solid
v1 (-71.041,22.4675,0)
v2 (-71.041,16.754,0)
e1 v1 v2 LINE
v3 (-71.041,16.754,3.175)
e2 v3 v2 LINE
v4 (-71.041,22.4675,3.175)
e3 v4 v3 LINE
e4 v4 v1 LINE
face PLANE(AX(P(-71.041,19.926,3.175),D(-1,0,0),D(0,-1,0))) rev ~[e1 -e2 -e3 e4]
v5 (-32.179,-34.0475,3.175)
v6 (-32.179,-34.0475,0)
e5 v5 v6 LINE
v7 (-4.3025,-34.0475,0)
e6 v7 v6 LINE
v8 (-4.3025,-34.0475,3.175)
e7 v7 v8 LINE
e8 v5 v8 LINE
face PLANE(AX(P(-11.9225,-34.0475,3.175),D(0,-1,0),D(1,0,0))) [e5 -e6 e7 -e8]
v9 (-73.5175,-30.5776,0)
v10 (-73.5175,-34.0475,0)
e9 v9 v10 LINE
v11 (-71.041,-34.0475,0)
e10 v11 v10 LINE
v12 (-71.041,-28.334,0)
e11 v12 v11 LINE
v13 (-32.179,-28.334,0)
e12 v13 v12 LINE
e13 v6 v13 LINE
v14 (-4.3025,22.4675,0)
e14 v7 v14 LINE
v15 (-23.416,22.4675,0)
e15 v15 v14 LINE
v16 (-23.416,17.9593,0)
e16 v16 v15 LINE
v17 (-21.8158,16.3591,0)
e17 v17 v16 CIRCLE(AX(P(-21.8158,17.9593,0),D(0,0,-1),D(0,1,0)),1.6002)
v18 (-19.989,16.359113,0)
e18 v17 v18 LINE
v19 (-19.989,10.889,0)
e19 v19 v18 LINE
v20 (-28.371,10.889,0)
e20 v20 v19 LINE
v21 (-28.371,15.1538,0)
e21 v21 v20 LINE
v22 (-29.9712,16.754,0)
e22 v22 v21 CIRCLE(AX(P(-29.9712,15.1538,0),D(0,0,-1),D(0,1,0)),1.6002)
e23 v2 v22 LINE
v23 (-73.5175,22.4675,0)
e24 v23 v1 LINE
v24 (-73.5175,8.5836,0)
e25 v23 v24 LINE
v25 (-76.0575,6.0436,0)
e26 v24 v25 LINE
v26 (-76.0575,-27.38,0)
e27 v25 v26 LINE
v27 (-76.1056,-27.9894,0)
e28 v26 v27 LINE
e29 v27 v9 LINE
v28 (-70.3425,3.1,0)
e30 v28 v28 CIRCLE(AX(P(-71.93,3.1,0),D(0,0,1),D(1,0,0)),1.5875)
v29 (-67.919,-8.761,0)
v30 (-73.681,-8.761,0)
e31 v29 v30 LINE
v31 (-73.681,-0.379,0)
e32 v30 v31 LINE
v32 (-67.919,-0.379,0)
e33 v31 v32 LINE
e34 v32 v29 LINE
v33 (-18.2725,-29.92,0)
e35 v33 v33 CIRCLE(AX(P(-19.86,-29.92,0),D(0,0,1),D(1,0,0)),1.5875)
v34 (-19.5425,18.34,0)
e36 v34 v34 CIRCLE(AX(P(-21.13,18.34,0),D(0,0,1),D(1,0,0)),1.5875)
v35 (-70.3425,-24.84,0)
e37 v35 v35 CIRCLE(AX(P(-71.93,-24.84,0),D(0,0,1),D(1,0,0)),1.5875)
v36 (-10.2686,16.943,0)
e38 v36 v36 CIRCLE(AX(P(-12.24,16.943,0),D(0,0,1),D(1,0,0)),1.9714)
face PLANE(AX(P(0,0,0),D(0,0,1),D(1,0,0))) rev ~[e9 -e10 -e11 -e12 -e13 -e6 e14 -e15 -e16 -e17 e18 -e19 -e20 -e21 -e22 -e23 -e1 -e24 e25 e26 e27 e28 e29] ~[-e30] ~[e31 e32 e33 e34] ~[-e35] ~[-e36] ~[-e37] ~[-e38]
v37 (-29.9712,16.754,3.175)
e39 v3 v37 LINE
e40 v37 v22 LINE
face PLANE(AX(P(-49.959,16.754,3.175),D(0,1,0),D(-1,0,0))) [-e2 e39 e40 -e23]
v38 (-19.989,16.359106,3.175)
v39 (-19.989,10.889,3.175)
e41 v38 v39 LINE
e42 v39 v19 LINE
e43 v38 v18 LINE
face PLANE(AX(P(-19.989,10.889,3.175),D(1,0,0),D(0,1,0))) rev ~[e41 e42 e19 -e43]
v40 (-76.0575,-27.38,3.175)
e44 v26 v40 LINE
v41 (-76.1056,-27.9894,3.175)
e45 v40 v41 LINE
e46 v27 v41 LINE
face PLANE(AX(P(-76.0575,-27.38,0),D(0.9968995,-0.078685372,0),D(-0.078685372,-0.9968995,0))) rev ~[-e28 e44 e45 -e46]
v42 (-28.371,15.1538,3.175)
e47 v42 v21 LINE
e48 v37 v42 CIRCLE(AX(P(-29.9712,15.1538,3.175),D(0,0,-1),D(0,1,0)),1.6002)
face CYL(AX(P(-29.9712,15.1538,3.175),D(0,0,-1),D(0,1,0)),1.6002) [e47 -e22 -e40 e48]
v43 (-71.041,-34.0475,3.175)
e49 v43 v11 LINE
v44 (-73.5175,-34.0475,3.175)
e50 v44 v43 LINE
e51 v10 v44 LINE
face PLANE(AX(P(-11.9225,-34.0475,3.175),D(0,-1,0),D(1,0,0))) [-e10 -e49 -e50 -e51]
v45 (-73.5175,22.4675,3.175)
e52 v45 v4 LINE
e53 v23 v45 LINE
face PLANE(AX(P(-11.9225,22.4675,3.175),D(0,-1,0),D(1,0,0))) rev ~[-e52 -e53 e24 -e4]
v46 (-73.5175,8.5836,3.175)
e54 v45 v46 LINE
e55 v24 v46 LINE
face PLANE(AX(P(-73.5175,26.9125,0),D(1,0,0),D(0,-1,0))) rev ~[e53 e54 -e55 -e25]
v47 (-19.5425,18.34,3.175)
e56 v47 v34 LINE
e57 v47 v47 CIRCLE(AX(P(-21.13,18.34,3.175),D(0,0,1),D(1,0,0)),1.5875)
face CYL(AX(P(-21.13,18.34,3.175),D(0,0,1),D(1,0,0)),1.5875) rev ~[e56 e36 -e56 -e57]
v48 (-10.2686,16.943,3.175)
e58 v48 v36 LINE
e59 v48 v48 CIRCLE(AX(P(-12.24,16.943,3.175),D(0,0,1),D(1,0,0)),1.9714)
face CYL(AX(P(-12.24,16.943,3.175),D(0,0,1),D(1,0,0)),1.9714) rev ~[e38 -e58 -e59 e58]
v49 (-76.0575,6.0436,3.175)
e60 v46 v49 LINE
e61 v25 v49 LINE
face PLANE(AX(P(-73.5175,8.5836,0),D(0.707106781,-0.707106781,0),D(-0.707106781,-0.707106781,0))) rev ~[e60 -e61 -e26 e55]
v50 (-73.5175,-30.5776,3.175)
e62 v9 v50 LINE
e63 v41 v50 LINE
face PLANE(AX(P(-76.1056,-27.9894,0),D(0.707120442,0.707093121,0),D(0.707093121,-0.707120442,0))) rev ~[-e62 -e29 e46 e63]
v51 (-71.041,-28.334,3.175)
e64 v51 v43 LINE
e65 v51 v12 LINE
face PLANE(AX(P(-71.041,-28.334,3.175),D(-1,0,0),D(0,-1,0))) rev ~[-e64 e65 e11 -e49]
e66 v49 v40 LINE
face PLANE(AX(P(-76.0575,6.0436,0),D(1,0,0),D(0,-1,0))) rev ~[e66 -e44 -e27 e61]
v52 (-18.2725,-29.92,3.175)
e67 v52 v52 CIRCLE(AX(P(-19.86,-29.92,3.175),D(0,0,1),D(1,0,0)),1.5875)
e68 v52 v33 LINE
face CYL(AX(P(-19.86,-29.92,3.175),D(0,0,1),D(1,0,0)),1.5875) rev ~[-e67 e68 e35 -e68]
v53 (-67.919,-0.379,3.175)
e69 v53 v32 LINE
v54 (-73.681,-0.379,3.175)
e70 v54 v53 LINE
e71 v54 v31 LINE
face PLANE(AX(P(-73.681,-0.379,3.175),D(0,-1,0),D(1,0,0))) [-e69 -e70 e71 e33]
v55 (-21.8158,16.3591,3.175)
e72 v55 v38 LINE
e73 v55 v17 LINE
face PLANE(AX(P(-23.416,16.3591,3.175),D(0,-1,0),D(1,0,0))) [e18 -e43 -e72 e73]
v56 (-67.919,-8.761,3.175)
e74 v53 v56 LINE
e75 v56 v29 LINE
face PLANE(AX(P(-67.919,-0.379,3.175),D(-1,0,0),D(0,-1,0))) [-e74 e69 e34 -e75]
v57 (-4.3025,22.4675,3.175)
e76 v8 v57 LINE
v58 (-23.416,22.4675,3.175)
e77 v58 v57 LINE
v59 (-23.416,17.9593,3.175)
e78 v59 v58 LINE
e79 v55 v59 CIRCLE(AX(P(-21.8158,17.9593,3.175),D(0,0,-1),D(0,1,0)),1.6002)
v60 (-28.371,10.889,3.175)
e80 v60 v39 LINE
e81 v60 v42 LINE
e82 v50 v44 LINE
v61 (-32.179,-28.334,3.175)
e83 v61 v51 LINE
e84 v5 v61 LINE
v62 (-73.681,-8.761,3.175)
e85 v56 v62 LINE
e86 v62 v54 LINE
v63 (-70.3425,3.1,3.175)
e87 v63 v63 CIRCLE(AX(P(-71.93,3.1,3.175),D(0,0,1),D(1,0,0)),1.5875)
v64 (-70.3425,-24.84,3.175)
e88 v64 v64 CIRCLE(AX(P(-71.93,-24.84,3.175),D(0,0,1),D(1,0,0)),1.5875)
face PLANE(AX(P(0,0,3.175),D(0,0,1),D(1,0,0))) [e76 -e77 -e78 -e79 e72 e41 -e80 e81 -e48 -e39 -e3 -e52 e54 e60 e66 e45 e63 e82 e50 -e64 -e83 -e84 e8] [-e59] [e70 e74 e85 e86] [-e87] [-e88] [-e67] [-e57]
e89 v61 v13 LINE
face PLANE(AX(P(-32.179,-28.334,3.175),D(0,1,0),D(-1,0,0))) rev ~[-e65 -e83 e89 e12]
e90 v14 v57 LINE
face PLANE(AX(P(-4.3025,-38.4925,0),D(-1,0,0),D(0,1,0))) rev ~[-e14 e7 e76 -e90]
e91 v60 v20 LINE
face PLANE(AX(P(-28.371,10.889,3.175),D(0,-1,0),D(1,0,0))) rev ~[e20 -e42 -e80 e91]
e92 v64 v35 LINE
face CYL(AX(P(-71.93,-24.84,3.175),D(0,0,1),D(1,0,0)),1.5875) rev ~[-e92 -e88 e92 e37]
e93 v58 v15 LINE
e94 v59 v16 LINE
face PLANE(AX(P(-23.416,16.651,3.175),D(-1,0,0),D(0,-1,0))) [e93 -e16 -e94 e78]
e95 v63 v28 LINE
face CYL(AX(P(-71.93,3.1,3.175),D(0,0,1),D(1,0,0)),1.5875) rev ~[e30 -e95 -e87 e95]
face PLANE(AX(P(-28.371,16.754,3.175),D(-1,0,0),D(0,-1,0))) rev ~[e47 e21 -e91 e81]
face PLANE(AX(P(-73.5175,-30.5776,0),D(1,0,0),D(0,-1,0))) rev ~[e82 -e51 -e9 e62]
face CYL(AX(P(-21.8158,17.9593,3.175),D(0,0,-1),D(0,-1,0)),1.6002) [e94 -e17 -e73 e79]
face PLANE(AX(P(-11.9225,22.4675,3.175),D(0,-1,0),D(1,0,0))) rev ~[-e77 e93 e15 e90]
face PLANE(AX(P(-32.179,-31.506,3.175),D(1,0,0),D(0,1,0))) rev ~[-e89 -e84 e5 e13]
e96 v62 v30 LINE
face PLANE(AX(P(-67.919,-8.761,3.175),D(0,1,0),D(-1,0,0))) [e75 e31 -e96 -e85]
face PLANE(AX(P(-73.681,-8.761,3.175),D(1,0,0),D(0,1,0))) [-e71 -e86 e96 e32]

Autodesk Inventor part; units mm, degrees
ref_plane "YZ Plane" through (0, 0, 0) normal (1, 0, 0) x (0, 1, 0)
ref_plane "XZ Plane" through (0, 0, 0) normal (0, 1, 0) x (-1, 0, 0)
ref_plane "XY Plane" through (0, 0, 0) normal (0, 0, 1) x (1, 0, 0)
sketch "0" plane through (0, 0, 0) normal (0, 0, 1) x (1, 0, 0)
  line L0 (-4.3025, -38.4925) -> (-4.3025, 26.9125)
  arc A0 (-4.3025, 26.9125) -> (-7.4775, 30.0875) centre (-7.4775, 26.9125) ccw
  line L1 (-7.4775, 30.0875) -> (-8.7475, 30.0875)
  arc A1 (-8.7475, 30.0875) -> (-11.9225, 26.9125) centre (-8.7475, 26.9125) ccw
  line L2 (-11.9225, 26.9125) -> (-11.9225, 22.4675)
  line L3 (-11.9225, 22.4675) -> (-65.8975, 22.4675)
  line L4 (-65.8975, 22.4675) -> (-65.8975, 26.9125)
  arc A2 (-65.8975, 26.9125) -> (-69.0725, 30.0875) centre (-69.0725, 26.9125) ccw
  line L5 (-69.0725, 30.0875) -> (-70.3425, 30.0875)
  arc A3 (-70.3425, 30.0875) -> (-73.5175, 26.9125) centre (-70.3425, 26.9125) ccw
  line L6 (-73.5175, 26.9125) -> (-73.5175, 8.5836)
  line L7 (-73.5175, 8.5836) -> (-76.0575, 6.0436)
  line L8 (-76.0575, 6.0436) -> (-76.0575, -27.38)
  line L9 (-76.0575, -27.38) -> (-76.1056, -27.9894)
  line L10 (-76.1056, -27.9894) -> (-73.5175, -30.5776)
  line L11 (-73.5175, -30.5776) -> (-73.5175, -38.4925)
  arc A4 (-73.5175, -38.4925) -> (-70.3425, -41.6675) centre (-70.3425, -38.4925) ccw
  line L12 (-70.3425, -41.6675) -> (-69.0725, -41.6675)
  arc A5 (-69.0725, -41.6675) -> (-65.8975, -38.4925) centre (-69.0725, -38.4925) ccw
  line L13 (-65.8975, -38.4925) -> (-65.8975, -34.0475)
  line L14 (-65.8975, -34.0475) -> (-11.9225, -34.0475)
  line L15 (-11.9225, -34.0475) -> (-11.9225, -38.4925)
  arc A6 (-11.9225, -38.4925) -> (-8.7475, -41.6675) centre (-8.7475, -38.4925) ccw
  line L16 (-8.7475, -41.6675) -> (-7.4775, -41.6675)
  arc A7 (-7.4775, -41.6675) -> (-4.3025, -38.4925) centre (-7.4775, -38.4925) ccw
  line L17 (-5.89, 20.88) -> (-5.89, -32.46)
  line L18 (-5.89, -32.46) -> (-71.93, -32.46)
  line L19 (-71.93, -32.46) -> (-71.93, -29.92)
  line L20 (-71.93, -29.92) -> (-74.47, -27.38)
  line L21 (-74.47, -27.38) -> (-74.47, 5.386)
  line L22 (-74.47, 5.386) -> (-71.93, 7.926)
  line L23 (-71.93, 7.926) -> (-71.93, 20.88)
  line L24 (-71.93, 20.88) -> (-5.89, 20.88)
  line L25 (-48.816, 17.135) -> (-23.416, 17.135)
  line L26 (-23.416, 17.135) -> (-23.416, 19.545)
  line L27 (-23.416, 19.545) -> (-48.816, 19.545)
  line L28 (-48.816, 19.545) -> (-48.816, 17.135)
  line L29 (-46.546, 19.34) -> (-46.546, 17.34)
  line L30 (-46.546, 17.34) -> (-48.546, 17.34)
  line L31 (-48.546, 17.34) -> (-48.546, 19.34)
  line L32 (-48.546, 19.34) -> (-46.546, 19.34)
  line L33 (-44.006, 19.34) -> (-44.006, 17.34)
  line L34 (-44.006, 17.34) -> (-46.006, 17.34)
  line L35 (-46.006, 17.34) -> (-46.006, 19.34)
  line L36 (-46.006, 19.34) -> (-44.006, 19.34)
  line L37 (-41.466, 19.34) -> (-41.466, 17.34)
  line L38 (-41.466, 17.34) -> (-43.466, 17.34)
  line L39 (-43.466, 17.34) -> (-43.466, 19.34)
  line L40 (-43.466, 19.34) -> (-41.466, 19.34)
  line L41 (-38.926, 19.34) -> (-38.926, 17.34)
  line L42 (-38.926, 17.34) -> (-40.926, 17.34)
  line L43 (-40.926, 17.34) -> (-40.926, 19.34)
  line L44 (-40.926, 19.34) -> (-38.926, 19.34)
  line L45 (-36.386, 19.34) -> (-36.386, 17.34)
  line L46 (-36.386, 17.34) -> (-38.386, 17.34)
  line L47 (-38.386, 17.34) -> (-38.386, 19.34)
  line L48 (-38.386, 19.34) -> (-36.386, 19.34)
  line L49 (-33.846, 19.34) -> (-33.846, 17.34)
  line L50 (-33.846, 17.34) -> (-35.846, 17.34)
  line L51 (-35.846, 17.34) -> (-35.846, 19.34)
  line L52 (-35.846, 19.34) -> (-33.846, 19.34)
  line L53 (-31.306, 19.34) -> (-31.306, 17.34)
  line L54 (-31.306, 17.34) -> (-33.306, 17.34)
  line L55 (-33.306, 17.34) -> (-33.306, 19.34)
  line L56 (-33.306, 19.34) -> (-31.306, 19.34)
  line L57 (-28.766, 19.34) -> (-28.766, 17.34)
  line L58 (-28.766, 17.34) -> (-30.766, 17.34)
  line L59 (-30.766, 17.34) -> (-30.766, 19.34)
  line L60 (-30.766, 19.34) -> (-28.766, 19.34)
  line L61 (-26.226, 17.34) -> (-28.226, 17.34)
  line L62 (-28.226, 17.34) -> (-28.226, 19.34)
  line L63 (-28.226, 19.34) -> (-26.226, 19.34)
  line L64 (-26.226, 19.34) -> (-26.226, 17.34)
  line L65 (-25.686, 17.34) -> (-25.686, 19.34)
  line L66 (-25.686, 19.34) -> (-23.686, 19.34)
  line L67 (-23.686, 19.34) -> (-23.686, 17.34)
  line L68 (-23.686, 17.34) -> (-25.686, 17.34)
  line L69 (-20.87, 16.27) -> (-22.41, 16.27)
  arc A8 (-22.41, 16.27) -> (-22.91, 15.77) centre (-22.41, 15.77) ccw
  arc A9 (-22.91, 15.77) -> (-23.41, 16.27) centre (-23.41, 15.77) ccw
  line L70 (-23.41, 16.27) -> (-24.95, 16.27)
  arc A10 (-24.95, 16.27) -> (-25.45, 15.77) centre (-24.95, 15.77) ccw
  arc A11 (-25.45, 15.77) -> (-25.95, 16.27) centre (-25.95, 15.77) ccw
  line L71 (-25.95, 16.27) -> (-27.49, 16.27)
  arc A12 (-27.49, 16.27) -> (-27.99, 15.77) centre (-27.49, 15.77) ccw
  line L72 (-27.99, 15.77) -> (-27.99, 11.77)
  arc A13 (-27.99, 11.77) -> (-27.49, 11.27) centre (-27.49, 11.77) ccw
  line L73 (-27.49, 11.27) -> (-25.95, 11.27)
  arc A14 (-25.95, 11.27) -> (-25.45, 11.77) centre (-25.95, 11.77) ccw
  arc A15 (-25.45, 11.77) -> (-24.95, 11.27) centre (-24.95, 11.77) ccw
  line L74 (-24.95, 11.27) -> (-23.41, 11.27)
  arc A16 (-23.41, 11.27) -> (-22.91, 11.77) centre (-23.41, 11.77) ccw
  arc A17 (-22.91, 11.77) -> (-22.41, 11.27) centre (-22.41, 11.77) ccw
  line L75 (-22.41, 11.27) -> (-20.87, 11.27)
  arc A18 (-20.87, 11.27) -> (-20.37, 11.77) centre (-20.87, 11.77) ccw
  line L76 (-20.37, 11.77) -> (-20.37, 15.77)
  arc A19 (-20.37, 15.77) -> (-20.87, 16.27) centre (-20.87, 15.77) ccw
  arc A20 (-24.555, 12.6317) -> (-24.555, 12.3643) centre (-24.178, 12.498) ccw
  line L77 (-24.555, 12.6317) -> (-24.555, 12.875)
  line L78 (-24.555, 12.875) -> (-24.3117, 12.875)
  arc A21 (-24.0443, 12.875) -> (-24.3117, 12.875) centre (-24.178, 12.498) ccw
  line L79 (-24.0443, 12.875) -> (-23.805, 12.875)
  line L80 (-23.805, 12.875) -> (-23.805, 12.6425)
  arc A22 (-23.805, 12.3535) -> (-23.805, 12.6425) centre (-24.178, 12.498) ccw
  line L81 (-23.805, 12.3535) -> (-23.805, 12.125)
  line L82 (-23.805, 12.125) -> (-24.0335, 12.125)
  arc A23 (-24.3225, 12.125) -> (-24.0335, 12.125) centre (-24.178, 12.498) ccw
  line L83 (-24.3225, 12.125) -> (-24.555, 12.125)
  line L84 (-24.555, 12.125) -> (-24.555, 12.3643)
  arc A24 (-24.555, 15.1717) -> (-24.555, 14.9043) centre (-24.178, 15.038) ccw
  line L85 (-24.555, 15.1717) -> (-24.555, 15.415)
  line L86 (-24.555, 15.415) -> (-24.3117, 15.415)
  arc A25 (-24.0443, 15.415) -> (-24.3117, 15.415) centre (-24.178, 15.038) ccw
  line L87 (-24.0443, 15.415) -> (-23.805, 15.415)
  line L88 (-23.805, 15.415) -> (-23.805, 15.1825)
  arc A26 (-23.805, 14.8935) -> (-23.805, 15.1825) centre (-24.178, 15.038) ccw
  line L89 (-23.805, 14.8935) -> (-23.805, 14.665)
  line L90 (-23.805, 14.665) -> (-24.0335, 14.665)
  arc A27 (-24.3225, 14.665) -> (-24.0335, 14.665) centre (-24.178, 15.038) ccw
  line L91 (-24.3225, 14.665) -> (-24.555, 14.665)
  line L92 (-24.555, 14.665) -> (-24.555, 14.9043)
  arc A28 (-27.095, 12.6317) -> (-27.095, 12.3643) centre (-26.718, 12.498) ccw
  line L93 (-27.095, 12.6317) -> (-27.095, 12.875)
  line L94 (-27.095, 12.875) -> (-26.8517, 12.875)
  arc A29 (-26.5843, 12.875) -> (-26.8517, 12.875) centre (-26.718, 12.498) ccw
  line L95 (-26.5843, 12.875) -> (-26.345, 12.875)
  line L96 (-26.345, 12.875) -> (-26.345, 12.6425)
  arc A30 (-26.345, 12.3535) -> (-26.345, 12.6425) centre (-26.718, 12.498) ccw
  line L97 (-26.345, 12.3535) -> (-26.345, 12.125)
  line L98 (-26.345, 12.125) -> (-26.5735, 12.125)
  arc A31 (-26.8625, 12.125) -> (-26.5735, 12.125) centre (-26.718, 12.498) ccw
  line L99 (-26.8625, 12.125) -> (-27.095, 12.125)
  line L100 (-27.095, 12.125) -> (-27.095, 12.3643)
  arc A32 (-27.095, 15.1717) -> (-27.095, 14.9043) centre (-26.718, 15.038) ccw
  line L101 (-27.095, 15.1717) -> (-27.095, 15.415)
  line L102 (-27.095, 15.415) -> (-26.8517, 15.415)
  arc A33 (-26.5843, 15.415) -> (-26.8517, 15.415) centre (-26.718, 15.038) ccw
  line L103 (-26.5843, 15.415) -> (-26.345, 15.415)
  line L104 (-26.345, 15.415) -> (-26.345, 15.1825)
  arc A34 (-26.345, 14.8935) -> (-26.345, 15.1825) centre (-26.718, 15.038) ccw
  line L105 (-26.345, 14.8935) -> (-26.345, 14.665)
  line L106 (-26.345, 14.665) -> (-26.5735, 14.665)
  arc A35 (-26.8625, 14.665) -> (-26.5735, 14.665) centre (-26.718, 15.038) ccw
  line L107 (-26.8625, 14.665) -> (-27.095, 14.665)
  line L108 (-27.095, 14.665) -> (-27.095, 14.9043)
  arc A36 (-22.015, 12.6317) -> (-22.015, 12.3643) centre (-21.638, 12.498) ccw
  line L109 (-22.015, 12.6317) -> (-22.015, 12.875)
  line L110 (-22.015, 12.875) -> (-21.7717, 12.875)
  arc A37 (-21.5043, 12.875) -> (-21.7717, 12.875) centre (-21.638, 12.498) ccw
  line L111 (-21.5043, 12.875) -> (-21.265, 12.875)
  line L112 (-21.265, 12.875) -> (-21.265, 12.6425)
  arc A38 (-21.265, 12.3535) -> (-21.265, 12.6425) centre (-21.638, 12.498) ccw
  line L113 (-21.265, 12.3535) -> (-21.265, 12.125)
  line L114 (-21.265, 12.125) -> (-21.4935, 12.125)
  arc A39 (-21.7825, 12.125) -> (-21.4935, 12.125) centre (-21.638, 12.498) ccw
  line L115 (-21.7825, 12.125) -> (-22.015, 12.125)
  line L116 (-22.015, 12.125) -> (-22.015, 12.3643)
  arc A40 (-22.015, 15.1717) -> (-22.015, 14.9043) centre (-21.638, 15.038) ccw
  line L117 (-22.015, 15.1717) -> (-22.015, 15.415)
  line L118 (-22.015, 15.415) -> (-21.7717, 15.415)
  arc A41 (-21.5043, 15.415) -> (-21.7717, 15.415) centre (-21.638, 15.038) ccw
  line L119 (-21.5043, 15.415) -> (-21.265, 15.415)
  line L120 (-21.265, 15.415) -> (-21.265, 15.1825)
  arc A42 (-21.265, 14.8935) -> (-21.265, 15.1825) centre (-21.638, 15.038) ccw
  line L121 (-21.265, 14.8935) -> (-21.265, 14.665)
  line L122 (-21.265, 14.665) -> (-21.4935, 14.665)
  arc A43 (-21.7825, 14.665) -> (-21.4935, 14.665) centre (-21.638, 15.038) ccw
  line L123 (-21.7825, 14.665) -> (-22.015, 14.665)
  line L124 (-22.015, 14.665) -> (-22.015, 14.9043)
  line L125 (-70.66, 17.135) -> (-50.34, 17.135)
  line L126 (-50.34, 17.135) -> (-50.34, 19.545)
  line L127 (-50.34, 19.545) -> (-70.66, 19.545)
  line L128 (-70.66, 19.545) -> (-70.66, 17.135)
  line L129 (-68.39, 19.34) -> (-68.39, 17.34)
  line L130 (-68.39, 17.34) -> (-70.39, 17.34)
  line L131 (-70.39, 17.34) -> (-70.39, 19.34)
  line L132 (-70.39, 19.34) -> (-68.39, 19.34)
  line L133 (-65.85, 19.34) -> (-65.85, 17.34)
  line L134 (-65.85, 17.34) -> (-67.85, 17.34)
  line L135 (-67.85, 17.34) -> (-67.85, 19.34)
  line L136 (-67.85, 19.34) -> (-65.85, 19.34)
  line L137 (-63.31, 19.34) -> (-63.31, 17.34)
  line L138 (-63.31, 17.34) -> (-65.31, 17.34)
  line L139 (-65.31, 17.34) -> (-65.31, 19.34)
  line L140 (-65.31, 19.34) -> (-63.31, 19.34)
  line L141 (-60.77, 19.34) -> (-60.77, 17.34)
  line L142 (-60.77, 17.34) -> (-62.77, 17.34)
  line L143 (-62.77, 17.34) -> (-62.77, 19.34)
  line L144 (-62.77, 19.34) -> (-60.77, 19.34)
  line L145 (-58.23, 19.34) -> (-58.23, 17.34)
  line L146 (-58.23, 17.34) -> (-60.23, 17.34)
  line L147 (-60.23, 17.34) -> (-60.23, 19.34)
  line L148 (-60.23, 19.34) -> (-58.23, 19.34)
  line L149 (-55.69, 19.34) -> (-55.69, 17.34)
  line L150 (-55.69, 17.34) -> (-57.69, 17.34)
  line L151 (-57.69, 17.34) -> (-57.69, 19.34)
  line L152 (-57.69, 19.34) -> (-55.69, 19.34)
  line L153 (-53.15, 17.34) -> (-55.15, 17.34)
  line L154 (-55.15, 17.34) -> (-55.15, 19.34)
  line L155 (-55.15, 19.34) -> (-53.15, 19.34)
  line L156 (-53.15, 19.34) -> (-53.15, 17.34)
  line L157 (-52.61, 17.34) -> (-52.61, 19.34)
  line L158 (-52.61, 19.34) -> (-50.61, 19.34)
  line L159 (-50.61, 19.34) -> (-50.61, 17.34)
  line L160 (-50.61, 17.34) -> (-52.61, 17.34)
  line L161 (-73.3, -1.26) -> (-73.3, -2.8)
  arc A44 (-73.3, -2.8) -> (-72.8, -3.3) centre (-72.8, -2.8) ccw
  arc A45 (-72.8, -3.3) -> (-73.3, -3.8) centre (-72.8, -3.8) ccw
  line L162 (-73.3, -3.8) -> (-73.3, -5.34)
  arc A46 (-73.3, -5.34) -> (-72.8, -5.84) centre (-72.8, -5.34) ccw
  arc A47 (-72.8, -5.84) -> (-73.3, -6.34) centre (-72.8, -6.34) ccw
  line L163 (-73.3, -6.34) -> (-73.3, -7.88)
  arc A48 (-73.3, -7.88) -> (-72.8, -8.38) centre (-72.8, -7.88) ccw
  line L164 (-72.8, -8.38) -> (-68.8, -8.38)
  arc A49 (-68.8, -8.38) -> (-68.3, -7.88) centre (-68.8, -7.88) ccw
  line L165 (-68.3, -7.88) -> (-68.3, -6.34)
  arc A50 (-68.3, -6.34) -> (-68.8, -5.84) centre (-68.8, -6.34) ccw
  arc A51 (-68.8, -5.84) -> (-68.3, -5.34) centre (-68.8, -5.34) ccw
  line L166 (-68.3, -5.34) -> (-68.3, -3.8)
  arc A52 (-68.3, -3.8) -> (-68.8, -3.3) centre (-68.8, -3.8) ccw
  arc A53 (-68.8, -3.3) -> (-68.3, -2.8) centre (-68.8, -2.8) ccw
  line L167 (-68.3, -2.8) -> (-68.3, -1.26)
  arc A54 (-68.3, -1.26) -> (-68.8, -0.76) centre (-68.8, -1.26) ccw
  line L168 (-68.8, -0.76) -> (-72.8, -0.76)
  arc A55 (-72.8, -0.76) -> (-73.3, -1.26) centre (-72.8, -1.26) ccw
  arc A56 (-69.905, -4.4308) -> (-69.905, -4.7092) centre (-69.53, -4.57) ccw
  line L169 (-69.905, -4.4308) -> (-69.905, -4.195)
  line L170 (-69.905, -4.195) -> (-69.6692, -4.195)
  arc A57 (-69.3908, -4.195) -> (-69.6692, -4.195) centre (-69.53, -4.57) ccw
  line L171 (-69.3908, -4.195) -> (-69.155, -4.195)
  line L172 (-69.155, -4.195) -> (-69.155, -4.4308)
  arc A58 (-69.155, -4.7092) -> (-69.155, -4.4308) centre (-69.53, -4.57) ccw
  line L173 (-69.155, -4.7092) -> (-69.155, -4.945)
  line L174 (-69.155, -4.945) -> (-69.3908, -4.945)
  arc A59 (-69.6692, -4.945) -> (-69.3908, -4.945) centre (-69.53, -4.57) ccw
  line L175 (-69.6692, -4.945) -> (-69.905, -4.945)
  line L176 (-69.905, -4.945) -> (-69.905, -4.7092)
  arc A60 (-72.445, -4.4308) -> (-72.445, -4.7092) centre (-72.07, -4.57) ccw
  line L177 (-72.445, -4.4308) -> (-72.445, -4.195)
  line L178 (-72.445, -4.195) -> (-72.2092, -4.195)
  arc A61 (-71.9308, -4.195) -> (-72.2092, -4.195) centre (-72.07, -4.57) ccw
  line L179 (-71.9308, -4.195) -> (-71.695, -4.195)
  line L180 (-71.695, -4.195) -> (-71.695, -4.4308)
  arc A62 (-71.695, -4.7092) -> (-71.695, -4.4308) centre (-72.07, -4.57) ccw
  line L181 (-71.695, -4.7092) -> (-71.695, -4.945)
  line L182 (-71.695, -4.945) -> (-71.9308, -4.945)
  arc A63 (-72.2092, -4.945) -> (-71.9308, -4.945) centre (-72.07, -4.57) ccw
  line L183 (-72.2092, -4.945) -> (-72.445, -4.945)
  line L184 (-72.445, -4.945) -> (-72.445, -4.7092)
  arc A64 (-69.905, -6.9708) -> (-69.905, -7.2492) centre (-69.53, -7.11) ccw
  line L185 (-69.905, -6.9708) -> (-69.905, -6.735)
  line L186 (-69.905, -6.735) -> (-69.6692, -6.735)
  arc A65 (-69.3908, -6.735) -> (-69.6692, -6.735) centre (-69.53, -7.11) ccw
  line L187 (-69.3908, -6.735) -> (-69.155, -6.735)
  line L188 (-69.155, -6.735) -> (-69.155, -6.9708)
  arc A66 (-69.155, -7.2492) -> (-69.155, -6.9708) centre (-69.53, -7.11) ccw
  line L189 (-69.155, -7.2492) -> (-69.155, -7.485)
  line L190 (-69.155, -7.485) -> (-69.3908, -7.485)
  arc A67 (-69.6692, -7.485) -> (-69.3908, -7.485) centre (-69.53, -7.11) ccw
  line L191 (-69.6692, -7.485) -> (-69.905, -7.485)
  line L192 (-69.905, -7.485) -> (-69.905, -7.2492)
  line L193 (-72.445, -7.485) -> (-72.445, -6.735)
  line L194 (-72.445, -6.735) -> (-71.695, -6.735)
  line L195 (-71.695, -6.735) -> (-71.695, -7.485)
  line L196 (-71.695, -7.485) -> (-72.445, -7.485)
  arc A68 (-69.905, -1.8908) -> (-69.905, -2.1692) centre (-69.53, -2.03) ccw
  line L197 (-69.905, -1.8908) -> (-69.905, -1.655)
  line L198 (-69.905, -1.655) -> (-69.6692, -1.655)
  arc A69 (-69.3908, -1.655) -> (-69.6692, -1.655) centre (-69.53, -2.03) ccw
  line L199 (-69.3908, -1.655) -> (-69.155, -1.655)
  line L200 (-69.155, -1.655) -> (-69.155, -1.8908)
  arc A70 (-69.155, -2.1692) -> (-69.155, -1.8908) centre (-69.53, -2.03) ccw
  line L201 (-69.155, -2.1692) -> (-69.155, -2.405)
  line L202 (-69.155, -2.405) -> (-69.3908, -2.405)
  arc A71 (-69.6692, -2.405) -> (-69.3908, -2.405) centre (-69.53, -2.03) ccw
  line L203 (-69.6692, -2.405) -> (-69.905, -2.405)
  line L204 (-69.905, -2.405) -> (-69.905, -2.1692)
  arc A72 (-72.445, -1.8908) -> (-72.445, -2.1692) centre (-72.07, -2.03) ccw
  line L205 (-72.445, -1.8908) -> (-72.445, -1.655)
  line L206 (-72.445, -1.655) -> (-72.2092, -1.655)
  arc A73 (-71.9308, -1.655) -> (-72.2092, -1.655) centre (-72.07, -2.03) ccw
  line L207 (-71.9308, -1.655) -> (-71.695, -1.655)
  line L208 (-71.695, -1.655) -> (-71.695, -1.8908)
  arc A74 (-71.695, -2.1692) -> (-71.695, -1.8908) centre (-72.07, -2.03) ccw
  line L209 (-71.695, -2.1692) -> (-71.695, -2.405)
  line L210 (-71.695, -2.405) -> (-71.9308, -2.405)
  arc A75 (-72.2092, -2.405) -> (-71.9308, -2.405) centre (-72.07, -2.03) ccw
  line L211 (-72.2092, -2.405) -> (-72.445, -2.405)
  line L212 (-72.445, -2.405) -> (-72.445, -2.1692)
  line L213 (-70.66, -31.125) -> (-55.42, -31.125)
  line L214 (-55.42, -31.125) -> (-55.42, -28.715)
  line L215 (-55.42, -28.715) -> (-70.66, -28.715)
  line L216 (-70.66, -28.715) -> (-70.66, -31.125)
  line L217 (-68.39, -28.92) -> (-68.39, -30.92)
  line L218 (-68.39, -30.92) -> (-70.39, -30.92)
  line L219 (-70.39, -30.92) -> (-70.39, -28.92)
  line L220 (-70.39, -28.92) -> (-68.39, -28.92)
  line L221 (-65.85, -28.92) -> (-65.85, -30.92)
  line L222 (-65.85, -30.92) -> (-67.85, -30.92)
  line L223 (-67.85, -30.92) -> (-67.85, -28.92)
  line L224 (-67.85, -28.92) -> (-65.85, -28.92)
  line L225 (-63.31, -28.92) -> (-63.31, -30.92)
  line L226 (-63.31, -30.92) -> (-65.31, -30.92)
  line L227 (-65.31, -30.92) -> (-65.31, -28.92)
  line L228 (-65.31, -28.92) -> (-63.31, -28.92)
  line L229 (-60.77, -28.92) -> (-60.77, -30.92)
  line L230 (-60.77, -30.92) -> (-62.77, -30.92)
  line L231 (-62.77, -30.92) -> (-62.77, -28.92)
  line L232 (-62.77, -28.92) -> (-60.77, -28.92)
  line L233 (-58.23, -30.92) -> (-60.23, -30.92)
  line L234 (-60.23, -30.92) -> (-60.23, -28.92)
  line L235 (-60.23, -28.92) -> (-58.23, -28.92)
  line L236 (-58.23, -28.92) -> (-58.23, -30.92)
  line L237 (-57.69, -30.92) -> (-57.69, -28.92)
  line L238 (-57.69, -28.92) -> (-55.69, -28.92)
  line L239 (-55.69, -28.92) -> (-55.69, -30.92)
  line L240 (-55.69, -30.92) -> (-57.69, -30.92)
  line L241 (-52.88, -31.125) -> (-32.56, -31.125)
  line L242 (-32.56, -31.125) -> (-32.56, -28.715)
  line L243 (-32.56, -28.715) -> (-52.88, -28.715)
  line L244 (-52.88, -28.715) -> (-52.88, -31.125)
  line L245 (-50.61, -28.92) -> (-50.61, -30.92)
  line L246 (-50.61, -30.92) -> (-52.61, -30.92)
  line L247 (-52.61, -30.92) -> (-52.61, -28.92)
  line L248 (-52.61, -28.92) -> (-50.61, -28.92)
  line L249 (-48.07, -28.92) -> (-48.07, -30.92)
  line L250 (-48.07, -30.92) -> (-50.07, -30.92)
  line L251 (-50.07, -30.92) -> (-50.07, -28.92)
  line L252 (-50.07, -28.92) -> (-48.07, -28.92)
  line L253 (-45.53, -28.92) -> (-45.53, -30.92)
  line L254 (-45.53, -30.92) -> (-47.53, -30.92)
  line L255 (-47.53, -30.92) -> (-47.53, -28.92)
  line L256 (-47.53, -28.92) -> (-45.53, -28.92)
  line L257 (-42.99, -28.92) -> (-42.99, -30.92)
  line L258 (-42.99, -30.92) -> (-44.99, -30.92)
  line L259 (-44.99, -30.92) -> (-44.99, -28.92)
  line L260 (-44.99, -28.92) -> (-42.99, -28.92)
  line L261 (-40.45, -28.92) -> (-40.45, -30.92)
  line L262 (-40.45, -30.92) -> (-42.45, -30.92)
  line L263 (-42.45, -30.92) -> (-42.45, -28.92)
  line L264 (-42.45, -28.92) -> (-40.45, -28.92)
  line L265 (-37.91, -28.92) -> (-37.91, -30.92)
  line L266 (-37.91, -30.92) -> (-39.91, -30.92)
  line L267 (-39.91, -30.92) -> (-39.91, -28.92)
  line L268 (-39.91, -28.92) -> (-37.91, -28.92)
  line L269 (-35.37, -30.92) -> (-37.37, -30.92)
  line L270 (-37.37, -30.92) -> (-37.37, -28.92)
  line L271 (-37.37, -28.92) -> (-35.37, -28.92)
  line L272 (-35.37, -28.92) -> (-35.37, -30.92)
  line L273 (-34.83, -30.92) -> (-34.83, -28.92)
  line L274 (-34.83, -28.92) -> (-32.83, -28.92)
  line L275 (-32.83, -28.92) -> (-32.83, -30.92)
  line L276 (-32.83, -30.92) -> (-34.83, -30.92)
  line L277 (-74.5335, 0.814) -> (-71.93, 0.814)
  arc A76 (-71.93, 0.814) -> (-71.93, 5.386) centre (-71.93, 3.1) ccw
  line L278 (-71.93, 5.386) -> (-74.5335, 5.386)
  line L279 (-74.5335, 5.386) -> (-74.5335, 5.4123)
  line L280 (-74.5335, 5.4123) -> (-71.9935, 7.9523)
  line L281 (-71.9935, 7.9523) -> (-71.9935, 20.9435)
  line L282 (-71.9935, 20.9435) -> (-23.416, 20.9435)
  line L283 (-23.416, 20.9435) -> (-23.416, 18.34)
  arc A77 (-23.416, 18.34) -> (-18.844, 18.34) centre (-21.13, 18.34) ccw
  line L284 (-18.844, 18.34) -> (-18.844, 20.9435)
  line L285 (-18.844, 20.9435) -> (-5.8265, 20.9435)
  line L286 (-5.8265, 20.9435) -> (-5.8265, 11.12)
  line L287 (-5.8265, 11.12) -> (-5.89, 11.12)
  line L288 (-5.89, 11.12) -> (-5.89, 0)
  line L289 (-5.89, 0) -> (-5.8265, 0)
  line L290 (-5.8265, 0) -> (-5.8265, -20.285)
  line L291 (-5.8265, -20.285) -> (-5.89, -20.285)
  line L292 (-5.89, -20.285) -> (-5.89, -29.285)
  line L293 (-5.89, -29.285) -> (-5.8265, -29.285)
  line L294 (-5.8265, -29.285) -> (-5.8265, -32.5235)
  line L295 (-5.8265, -32.5235) -> (-71.9935, -32.5235)
  line L296 (-71.9935, -32.5235) -> (-71.9935, -29.9463)
  line L297 (-71.9935, -29.9463) -> (-74.5335, -27.4063)
  line L298 (-74.5335, -27.4063) -> (-74.5335, -27.126)
  line L299 (-74.5335, -27.126) -> (-71.93, -27.126)
  arc A78 (-71.93, -27.126) -> (-71.93, -22.554) centre (-71.93, -24.84) ccw
  line L300 (-71.93, -22.554) -> (-74.5335, -22.554)
  line L301 (-74.5335, -22.554) -> (-74.5335, 0.814)
  line L302 (-22.146, -29.92) -> (-22.146, -32.46)
  line L303 (-22.146, -32.46) -> (-17.574, -32.46)
  line L304 (-17.574, -32.46) -> (-17.574, -29.92)
  arc A79 (-17.574, -29.92) -> (-22.146, -29.92) centre (-19.86, -29.92) ccw
  circle A80 centre (-8.1125, -37.8575) radius 2
  circle A81 centre (-69.7075, -37.8575) radius 2
  circle A82 centre (-69.7075, 26.2775) radius 2
  circle A83 centre (-8.1125, 26.2775) radius 2
  line L305 (-47.53, -28.92) -> (-47.53, -30.92)
  circle A84 centre (-12.24, 16.943) radius 1.5
  point P0 (-20.37, 11.77)
  point P1 (-22.41, 11.27)
  point P2 (-22.91, 11.77)
  point P3 (-24.95, 11.27)
  point P4 (-27.99, 15.77)
  point P5 (-23.41, 16.27)
  point P6 (-22.91, 15.77)
  point P7 (-68.8, -0.76)
  point P8 (-68.8, -5.84)
  point P9 (-72.8, -8.38)
  point P10 (-73.5175, 26.9125)
  point P11 (-11.9225, -34.0475)
  point P12 (-74.47, 0.814)
  point P13 (-23.416, 20.88)
  point P14 (-18.844, 20.88)
  point P15 (-18.844, 18.34)
  point P16 (-20.528, 16.1347)
  point P17 (-22.1, 16.27)
  point P18 (-74.47, -27.126)
  point P19 (-74.47, -22.554)
extrude "Extrusion1" add sketch "0" along normal blind 3.175 contours A7 L16 A6 L15 L14 L13 A5 L12 A4 L11 L10 L9 L8 L7 L6 A3 L5 A2 L4 L3 L2 A1 L1 A0 L0 | L24 L284 L285 L286 L287 L17 | L17 L18 L304 A79 L302 L19 L20 L21 L299 A78 L300 L277 A76 L278 L22 L23 L24 L283 L27 L28 L25 L26 A77 L69 A8 A9 L70 A10 A11 L71 A12 L72 A13 L73 A14 A15 L74 A16 A17 L75 A18 L76 A19 L284 | L289 L290 L291 L17 | L24 L23 L22 L278 L279 L280 L281 L282 L283 | L293 L294 L295 L296 L297 L298 L299 L21 L20 L19 L18 L17 | L21 L300 L301 L277
sketch "Sketch3" plane through (0, 0, 3.175) normal (0, 0, 1) x (1, 0, 0)
  line L0 (-11.9225, 22.4675) -> (-65.8975, 22.4675) projected
  line L1 (-65.8975, 22.4675) -> (-76.7323, 22.4675)
  line L2 (-76.7323, 22.4675) -> (-76.7323, 33.3993)
  line L3 (-76.7323, 33.3993) -> (-65.8975, 33.3993)
  line L4 (-65.8975, 33.3993) -> (-65.8975, 22.4675)
  line L5 (-11.9225, 22.4675) -> (0, 22.4675)
  line L6 (0, 22.4675) -> (0, 30.8652)
  line L7 (0, 30.8652) -> (-11.9225, 30.8652)
  line L8 (-11.9225, 30.8652) -> (-11.9225, 22.4675)
  line L9 (-65.8975, -34.0475) -> (-11.9225, -34.0475) projected
  line L10 (-11.9225, -34.0475) -> (4.7641, -34.0475)
  line L11 (4.7641, -34.0475) -> (4.7641, -42.8261)
  line L12 (4.7641, -42.8261) -> (-11.9225, -42.8261)
  line L13 (-11.9225, -42.8261) -> (-11.9225, -34.0475)
  line L14 (-65.8975, -34.0475) -> (-80.7868, -34.0475)
  line L15 (-80.7868, -34.0475) -> (-80.7868, -44.3466)
  line L16 (-80.7868, -44.3466) -> (-65.8975, -44.3466)
  line L17 (-65.8975, -44.3466) -> (-65.8975, -34.0475)
  line L18 (-68.3, -8.38) -> (-73.3, -8.38)
  line L19 (-73.3, -8.38) -> (-73.3, -0.76)
  line L20 (-73.3, -0.76) -> (-68.3, -0.76)
  line L21 (-68.3, -0.76) -> (-68.3, -8.38)
  line L22 (-27.99, 16.27) -> (-20.37, 16.27)
  line L23 (-20.37, 16.27) -> (-20.37, 11.27)
  line L24 (-20.37, 11.27) -> (-27.99, 11.27)
  line L25 (-27.99, 11.27) -> (-27.99, 16.27)
  arc A0 (-4.3025, 26.9125) -> (-7.4775, 30.0875) centre (-7.4775, 26.9125) ccw projected
  line L26 (-7.4775, 30.0875) -> (-8.7475, 30.0875) projected
  arc A1 (-8.7475, 30.0875) -> (-11.9225, 26.9125) centre (-8.7475, 26.9125) ccw projected
  line L27 (-11.9225, 26.9125) -> (-11.9225, 22.4675) projected
  line L28 (-11.9225, 22.4675) -> (-65.8975, 22.4675) projected
  line L29 (-65.8975, 22.4675) -> (-65.8975, 26.9125) projected
  arc A2 (-65.8975, 26.9125) -> (-69.0725, 30.0875) centre (-69.0725, 26.9125) ccw projected
  line L30 (-69.0725, 30.0875) -> (-70.3425, 30.0875) projected
  arc A3 (-70.3425, 30.0875) -> (-73.5175, 26.9125) centre (-70.3425, 26.9125) ccw projected
  line L31 (-73.5175, 26.9125) -> (-73.5175, 8.5836) projected
  line L32 (-73.5175, 8.5836) -> (-76.0575, 6.0436) projected
  line L33 (-76.0575, 6.0436) -> (-76.0575, -27.38) projected
  line L34 (-76.0575, -27.38) -> (-76.1056, -27.9894) projected
  line L35 (-76.1056, -27.9894) -> (-73.5175, -30.5776) projected
  line L36 (-73.5175, -30.5776) -> (-73.5175, -38.4925) projected
  arc A4 (-73.5175, -38.4925) -> (-70.3425, -41.6675) centre (-70.3425, -38.4925) ccw projected
  line L37 (-70.3425, -41.6675) -> (-69.0725, -41.6675) projected
  arc A5 (-69.0725, -41.6675) -> (-65.8975, -38.4925) centre (-69.0725, -38.4925) ccw projected
  line L38 (-65.8975, -38.4925) -> (-65.8975, -34.0475) projected
  line L39 (-65.8975, -34.0475) -> (-11.9225, -34.0475) projected
  line L40 (-11.9225, -34.0475) -> (-11.9225, -38.4925) projected
  arc A6 (-11.9225, -38.4925) -> (-8.7475, -41.6675) centre (-8.7475, -38.4925) ccw projected
  line L41 (-8.7475, -41.6675) -> (-7.4775, -41.6675) projected
  arc A7 (-7.4775, -41.6675) -> (-4.3025, -38.4925) centre (-7.4775, -38.4925) ccw projected
  line L42 (-4.3025, -38.4925) -> (-4.3025, 26.9125) projected
  line L43 (-23.416, 18.34) -> (-23.416, 17.135) projected
  line L44 (-23.416, 17.135) -> (-48.816, 17.135) projected
  line L45 (-48.816, 17.135) -> (-48.816, 19.545) projected
  line L46 (-48.816, 19.545) -> (-23.416, 19.545) projected
  line L47 (-22.41, 16.27) -> (-22.1, 16.27) projected
  arc A8 (-20.37, 15.77) -> (-20.528, 16.1347) centre (-20.87, 15.77) ccw projected
  line L48 (-20.37, 15.77) -> (-20.37, 11.77) projected
  arc A9 (-20.87, 11.27) -> (-20.37, 11.77) centre (-20.87, 11.77) ccw projected
  line L49 (-20.87, 11.27) -> (-22.41, 11.27) projected
  arc A10 (-22.91, 11.77) -> (-22.41, 11.27) centre (-22.41, 11.77) ccw projected
  arc A11 (-23.41, 11.27) -> (-22.91, 11.77) centre (-23.41, 11.77) ccw projected
  line L50 (-23.41, 11.27) -> (-24.95, 11.27) projected
  arc A12 (-25.45, 11.77) -> (-24.95, 11.27) centre (-24.95, 11.77) ccw projected
  arc A13 (-25.95, 11.27) -> (-25.45, 11.77) centre (-25.95, 11.77) ccw projected
  line L51 (-25.95, 11.27) -> (-27.49, 11.27) projected
  arc A14 (-27.99, 11.77) -> (-27.49, 11.27) centre (-27.49, 11.77) ccw projected
  line L52 (-27.99, 11.77) -> (-27.99, 15.77) projected
  arc A15 (-27.49, 16.27) -> (-27.99, 15.77) centre (-27.49, 15.77) ccw projected
  line L53 (-27.49, 16.27) -> (-25.95, 16.27) projected
  arc A16 (-25.45, 15.77) -> (-25.95, 16.27) centre (-25.95, 15.77) ccw projected
  arc A17 (-24.95, 16.27) -> (-25.45, 15.77) centre (-24.95, 15.77) ccw projected
  line L54 (-24.95, 16.27) -> (-23.41, 16.27) projected
  arc A18 (-22.91, 15.77) -> (-23.41, 16.27) centre (-23.41, 15.77) ccw projected
  arc A19 (-22.41, 16.27) -> (-22.91, 15.77) centre (-22.41, 15.77) ccw projected
  line L55 (-70.66, 17.135) -> (-70.66, 19.545) projected
  line L56 (-70.66, 19.545) -> (-50.34, 19.545) projected
  line L57 (-50.34, 19.545) -> (-50.34, 17.135) projected
  line L58 (-50.34, 17.135) -> (-70.66, 17.135) projected
  arc A20 (-72.8, -0.76) -> (-73.3, -1.26) centre (-72.8, -1.26) ccw projected
  line L59 (-72.8, -0.76) -> (-68.8, -0.76) projected
  arc A21 (-68.3, -1.26) -> (-68.8, -0.76) centre (-68.8, -1.26) ccw projected
  line L60 (-68.3, -1.26) -> (-68.3, -2.8) projected
  arc A22 (-68.8, -3.3) -> (-68.3, -2.8) centre (-68.8, -2.8) ccw projected
  arc A23 (-68.3, -3.8) -> (-68.8, -3.3) centre (-68.8, -3.8) ccw projected
  line L61 (-68.3, -3.8) -> (-68.3, -5.34) projected
  arc A24 (-68.8, -5.84) -> (-68.3, -5.34) centre (-68.8, -5.34) ccw projected
  arc A25 (-68.3, -6.34) -> (-68.8, -5.84) centre (-68.8, -6.34) ccw projected
  line L62 (-68.3, -6.34) -> (-68.3, -7.88) projected
  arc A26 (-68.8, -8.38) -> (-68.3, -7.88) centre (-68.8, -7.88) ccw projected
  line L63 (-68.8, -8.38) -> (-72.8, -8.38) projected
  arc A27 (-73.3, -7.88) -> (-72.8, -8.38) centre (-72.8, -7.88) ccw projected
  line L64 (-73.3, -7.88) -> (-73.3, -6.34) projected
  arc A28 (-72.8, -5.84) -> (-73.3, -6.34) centre (-72.8, -6.34) ccw projected
  arc A29 (-73.3, -5.34) -> (-72.8, -5.84) centre (-72.8, -5.34) ccw projected
  line L65 (-73.3, -5.34) -> (-73.3, -3.8) projected
  arc A30 (-72.8, -3.3) -> (-73.3, -3.8) centre (-72.8, -3.8) ccw projected
  arc A31 (-73.3, -2.8) -> (-72.8, -3.3) centre (-72.8, -2.8) ccw projected
  line L66 (-73.3, -2.8) -> (-73.3, -1.26) projected
  line L67 (-70.66, -31.125) -> (-70.66, -28.715) projected
  line L68 (-70.66, -28.715) -> (-55.42, -28.715) projected
  line L69 (-55.42, -28.715) -> (-55.42, -31.125) projected
  line L70 (-55.42, -31.125) -> (-70.66, -31.125) projected
  line L71 (-52.88, -31.125) -> (-52.88, -28.715) projected
  line L72 (-52.88, -28.715) -> (-32.56, -28.715) projected
  line L73 (-32.56, -28.715) -> (-32.56, -31.125) projected
  line L74 (-32.56, -31.125) -> (-52.88, -31.125) projected
  circle A32 centre (-12.24, 16.943) radius 1.5 projected
  circle A33 centre (-8.1125, 26.2775) radius 2 projected
  circle A34 centre (-69.7075, 26.2775) radius 2 projected
  circle A35 centre (-69.7075, -37.8575) radius 2 projected
  circle A36 centre (-8.1125, -37.8575) radius 2 projected
  line L75 (-28.371, 10.889) -> (-19.989, 10.889)
  line L76 (-19.989, 10.889) -> (-19.989, 16.651)
  line L77 (-19.989, 16.651) -> (-28.371, 16.651)
  line L78 (-28.371, 16.651) -> (-28.371, 10.889)
  line L79 (-49.197, 16.754) -> (-23.035, 16.754)
  line L80 (-23.035, 16.754) -> (-23.035, 19.926)
  line L81 (-23.035, 19.926) -> (-49.197, 19.926)
  line L82 (-49.197, 19.926) -> (-49.197, 16.754)
  line L83 (-71.041, 16.754) -> (-71.041, 19.926)
  line L84 (-71.041, 19.926) -> (-49.959, 19.926)
  line L85 (-49.959, 19.926) -> (-49.959, 16.754)
  line L86 (-49.959, 16.754) -> (-71.041, 16.754)
  line L87 (-67.919, -8.761) -> (-73.681, -8.761)
  line L88 (-73.681, -8.761) -> (-73.681, -0.379)
  line L89 (-73.681, -0.379) -> (-67.919, -0.379)
  line L90 (-67.919, -0.379) -> (-67.919, -8.761)
  line L91 (-55.039, -28.334) -> (-71.041, -28.334)
  line L92 (-71.041, -28.334) -> (-71.041, -31.506)
  line L93 (-71.041, -31.506) -> (-55.039, -31.506)
  line L94 (-55.039, -31.506) -> (-55.039, -28.334)
  line L95 (-32.179, -28.334) -> (-53.261, -28.334)
  line L96 (-53.261, -28.334) -> (-53.261, -31.506)
  line L97 (-53.261, -31.506) -> (-32.179, -31.506)
  line L98 (-32.179, -31.506) -> (-32.179, -28.334)
  circle A37 centre (-12.24, 16.943) radius 1.627
  line L99 (-23.416, 20.88) -> (-18.844, 20.88) projected
  line L100 (-18.844, 20.88) -> (-18.844, 18.34) projected
  arc A38 (-20.528, 16.1347) -> (-18.844, 18.34) centre (-21.13, 18.34) ccw projected
  arc A39 (-23.416, 18.34) -> (-22.1, 16.27) centre (-21.13, 18.34) ccw projected
  line L101 (-23.416, 19.545) -> (-23.416, 20.88) projected
  point P0 (0, 0)
  dimension "d2" = 0.381
  dimension "d3" = 0.381
  dimension "d4" = 0.381
  dimension "d5" = 0.381
  dimension "d6" = 0.381
  dimension "d7" = 0.381
  dimension "d8" = 0.127
extrude "Extrusion2" cut sketch "Sketch3" against normal blind 25.4 contours L8 A1 L26 A0 L42 L5 | L1 L31 A3 L30 A2 L4 | L42 A0 L26 A1 L8 L7 L6 L5 | L1 L2 L3 L4 A2 L30 A3 L31 | L42 A7 L41 A6 L13 L10 | L10 L11 L12 L13 A6 L41 A7 L42 | L17 A5 L37 A4 L36 L14 | L36 A4 L37 A5 L17 L16 L15 L14 | L18 A26 L21 | L18 A27 L19 A28 A29 A30 A31 A20 L20 A21 L21 A22 A23 A24 A25 A26 | L18 L19 A27 | A25 A24 L21 | L19 A29 A28 | A23 A22 L21 | L19 A31 A30 | A21 L20 L21 | L19 L20 A20 | L25 L24 L23 A38 L76 L75 L78 L77 A39 L22 | L22 A15 L25 | L22 A16 A17 A18 A19 L23 A38 A8 A9 L24 A10 A11 A12 A13 A14 L25 A15 | L22 A17 A16 | A14 L24 L25 | L22 A19 A18 | A13 A12 L24 | A39 L77 L76 A38 L23 L22 | A11 A10 L24 | L23 A8 A38 | A39 L43 L44 L45 L46 L101 L81 L80 | L80 L79 L82 L81 L101 L46 L45 L44 L43 A39 | A9 L23 L24 | L55 L56 L57 L58 | L67 L68 L69 L70 | L71 L72 L73 L74 | A32 | A33 | A34 | A35 | A36 | L83 L84 L85 L86 | L87 L88 L89 L90 | L94 L93 L92 L91 | L98 L97 L96 L95 | A37
sketch "Sketch4" plane through (0, 0, 3.175) normal (0, 0, 1) x (1, 0, 0)
  arc A0 (-19.989, 16.3591) -> (-18.844, 18.34) centre (-21.13, 18.34) ccw projected
  circle A1 centre (-21.13, 18.34) radius 1.5875
  arc A2 (-17.574, -29.92) -> (-22.146, -29.92) centre (-19.86, -29.92) ccw projected
  circle A3 centre (-19.86, -29.92) radius 1.5875
  arc A4 (-71.93, -27.126) -> (-71.93, -22.554) centre (-71.93, -24.84) ccw projected
  circle A5 centre (-71.93, -24.84) radius 1.5875
  arc A6 (-71.93, 0.814) -> (-71.93, 5.386) centre (-71.93, 3.1) ccw projected
  circle A7 centre (-71.93, 3.1) radius 1.5875
  line L0 (-73.5175, -34.0475) -> (-4.3025, -34.0475) projected
  line L1 (-4.3025, -34.0475) -> (-4.3025, 22.4675) projected
  line L2 (-4.3025, 22.4675) -> (-73.5175, 22.4675) projected
  line L3 (-73.5175, 22.4675) -> (-73.5175, 8.5836) projected
  line L4 (-73.5175, 8.5836) -> (-76.0575, 6.0436) projected
  line L5 (-76.0575, 6.0436) -> (-76.0575, -27.38) projected
  line L6 (-76.0575, -27.38) -> (-76.1056, -27.9894) projected
  line L7 (-76.1056, -27.9894) -> (-73.5175, -30.5776) projected
  line L8 (-73.5175, -30.5776) -> (-73.5175, -34.0475) projected
  line L9 (-28.371, 16.651) -> (-22.6705, 16.651) projected
  arc A8 (-23.035, 17.0764) -> (-22.6705, 16.651) centre (-21.13, 18.34) ccw projected
  line L10 (-23.035, 17.0764) -> (-23.035, 16.754) projected
  line L11 (-23.035, 16.754) -> (-49.197, 16.754) projected
  line L12 (-49.197, 16.754) -> (-49.197, 19.926) projected
  line L13 (-49.197, 19.926) -> (-23.416, 19.926) projected
  line L14 (-23.416, 19.926) -> (-23.416, 20.88) projected
  line L15 (-23.416, 20.88) -> (-18.844, 20.88) projected
  line L16 (-18.844, 20.88) -> (-18.844, 18.34) projected
  arc A9 (-19.989, 16.3591) -> (-18.844, 18.34) centre (-21.13, 18.34) ccw projected
  line L17 (-19.989, 16.3591) -> (-19.989, 10.889) projected
  line L18 (-19.989, 10.889) -> (-28.371, 10.889) projected
  line L19 (-28.371, 10.889) -> (-28.371, 16.651) projected
  line L20 (-32.179, -31.506) -> (-53.261, -31.506) projected
  line L21 (-53.261, -31.506) -> (-53.261, -28.334) projected
  line L22 (-53.261, -28.334) -> (-32.179, -28.334) projected
  line L23 (-32.179, -28.334) -> (-32.179, -31.506) projected
  circle A10 centre (-12.24, 16.943) radius 1.627 projected
  line L24 (-71.041, 19.926) -> (-49.959, 19.926) projected
  line L25 (-49.959, 19.926) -> (-49.959, 16.754) projected
  line L26 (-49.959, 16.754) -> (-71.041, 16.754) projected
  line L27 (-71.041, 16.754) -> (-71.041, 19.926) projected
  line L28 (-55.039, -31.506) -> (-71.041, -31.506) projected
  line L29 (-71.041, -31.506) -> (-71.041, -28.334) projected
  line L30 (-71.041, -28.334) -> (-55.039, -28.334) projected
  line L31 (-55.039, -28.334) -> (-55.039, -31.506) projected
  line L32 (-73.681, -8.761) -> (-73.681, -0.379) projected
  line L33 (-73.681, -0.379) -> (-67.919, -0.379) projected
  line L34 (-67.919, -0.379) -> (-67.919, -8.761) projected
  line L35 (-67.919, -8.761) -> (-73.681, -8.761) projected
  line L36 (-17.574, -32.46) -> (-22.146, -32.46) projected
  line L37 (-22.146, -32.46) -> (-22.146, -29.92) projected
  arc A11 (-17.574, -29.92) -> (-22.146, -29.92) centre (-19.86, -29.92) ccw projected
  line L38 (-17.574, -29.92) -> (-17.574, -32.46) projected
  line L39 (-74.47, 5.386) -> (-71.93, 5.386) projected
  arc A12 (-71.93, 0.814) -> (-71.93, 5.386) centre (-71.93, 3.1) ccw projected
  line L40 (-71.93, 0.814) -> (-74.47, 0.814) projected
  line L41 (-74.47, 0.814) -> (-74.47, 5.386) projected
  line L42 (-74.47, -27.126) -> (-74.47, -22.554) projected
  line L43 (-74.47, -22.554) -> (-71.93, -22.554) projected
  arc A13 (-71.93, -27.126) -> (-71.93, -22.554) centre (-71.93, -24.84) ccw projected
  line L44 (-71.93, -27.126) -> (-74.47, -27.126) projected
  line L45 (-22.6705, 16.651) -> (-19.989, 16.651)
  line L46 (-19.989, 16.651) -> (-19.989, 16.3591)
  line L47 (-19.989, 16.3591) -> (-22.6705, 16.651)
  line L48 (-23.035, 17.0764) -> (-23.416, 19.926)
  line L49 (-23.416, 19.926) -> (-23.035, 16.754)
  point P0 (0, 0)
  point P1 (-22.146, -29.92)
  point P2 (-71.93, 5.386)
  point P3 (-71.93, 0.814)
  dimension "d11" = 3.175
  dimension "d12" = 3.175
  dimension "d13" = 3.175
  dimension "d14" = 3.175
extrude "Extrusion3" add sketch "Sketch4" against normal blind 3.175 contours L46 L45 A8 L48 L14 L15 L16 A0 | L47 L45 L46 | L10 L49 L48 | L38 L36 L37 A2 | L44 L42 L43 A4 | L40 L41 L39 A6
sketch "Sketch6" plane through (0, 0, 3.175) normal (0, 0, 1) x (1, 0, 0)
  line L0 (-49.197, 19.926) -> (-23.416, 19.926) projected
  line L1 (-23.416, 19.926) -> (-23.416, 16.754)
  line L2 (-49.197, 16.754) -> (-23.035, 16.754) projected
  line L3 (-28.371, 16.651) -> (-22.6705, 16.651) projected
  line L4 (-23.416, 16.651) -> (-23.416, 16.3591)
  line L5 (-19.989, 16.3591) -> (-19.989, 10.889) projected
  line L6 (-23.416, 16.3591) -> (-19.989, 16.3591)
  circle A0 centre (-71.93, -24.84) radius 1.5875 projected
  circle A1 centre (-71.93, 3.1) radius 1.5875 projected
  circle A2 centre (-19.86, -29.92) radius 1.5875 projected
  line L7 (-19.989, 16.3591) -> (-19.989, 10.889) projected
  line L8 (-19.989, 10.889) -> (-28.371, 10.889) projected
  line L9 (-28.371, 10.889) -> (-28.371, 16.651) projected
  line L10 (-28.371, 16.651) -> (-22.6705, 16.651) projected
  line L11 (-22.6705, 16.651) -> (-19.989, 16.3591) projected
  circle A3 centre (-21.13, 18.34) radius 1.5875 projected
  line L12 (-73.5175, -34.0475) -> (-4.3025, -34.0475) projected
  line L13 (-4.3025, -34.0475) -> (-4.3025, 22.4675) projected
  line L14 (-4.3025, 22.4675) -> (-73.5175, 22.4675) projected
  line L15 (-73.5175, 22.4675) -> (-73.5175, 8.5836) projected
  line L16 (-73.5175, 8.5836) -> (-76.0575, 6.0436) projected
  line L17 (-76.0575, 6.0436) -> (-76.0575, -27.38) projected
  line L18 (-76.0575, -27.38) -> (-76.1056, -27.9894) projected
  line L19 (-76.1056, -27.9894) -> (-73.5175, -30.5776) projected
  line L20 (-73.5175, -30.5776) -> (-73.5175, -34.0475) projected
  line L21 (-23.416, 19.926) -> (-23.035, 16.754) projected
  line L22 (-23.035, 16.754) -> (-49.197, 16.754) projected
  line L23 (-49.197, 16.754) -> (-49.197, 19.926) projected
  line L24 (-49.197, 19.926) -> (-23.416, 19.926) projected
  line L25 (-32.179, -31.506) -> (-53.261, -31.506) projected
  line L26 (-53.261, -31.506) -> (-53.261, -28.334) projected
  line L27 (-53.261, -28.334) -> (-32.179, -28.334) projected
  line L28 (-32.179, -28.334) -> (-32.179, -31.506) projected
  circle A4 centre (-12.24, 16.943) radius 1.627 projected
  line L29 (-71.041, 19.926) -> (-49.959, 19.926) projected
  line L30 (-49.959, 19.926) -> (-49.959, 16.754) projected
  line L31 (-49.959, 16.754) -> (-71.041, 16.754) projected
  line L32 (-71.041, 16.754) -> (-71.041, 19.926) projected
  line L33 (-55.039, -31.506) -> (-71.041, -31.506) projected
  line L34 (-71.041, -31.506) -> (-71.041, -28.334) projected
  line L35 (-71.041, -28.334) -> (-55.039, -28.334) projected
  line L36 (-55.039, -28.334) -> (-55.039, -31.506) projected
  line L37 (-73.681, -8.761) -> (-73.681, -0.379) projected
  line L38 (-73.681, -0.379) -> (-67.919, -0.379) projected
  line L39 (-67.919, -0.379) -> (-67.919, -8.761) projected
  line L40 (-67.919, -8.761) -> (-73.681, -8.761) projected
  point P0 (0, 0)
extrude "Extrusion4" add sketch "Sketch6" against normal blind 3.175 contours L21 L2 L1 | L3 L11 L6 L4
sketch "Sketch7" plane through (0, 0, 3.175) normal (0, 0, 1) x (1, 0, 0)
  line L0 (-28.371, 16.651) -> (-23.416, 16.651) projected
  line L1 (-28.371, 16.651) -> (-23.416, 16.651)
  line L2 (-23.416, 16.651) -> (-23.416, 16.754)
  line L3 (-23.416, 16.754) -> (-28.371, 16.754)
  line L4 (-28.371, 16.754) -> (-28.371, 16.651)
  circle A0 centre (-71.93, -24.84) radius 1.5875 projected
  circle A1 centre (-71.93, 3.1) radius 1.5875 projected
  circle A2 centre (-19.86, -29.92) radius 1.5875 projected
  line L5 (-19.989, 16.3591) -> (-19.989, 10.889) projected
  line L6 (-19.989, 10.889) -> (-28.371, 10.889) projected
  line L7 (-28.371, 10.889) -> (-28.371, 16.651) projected
  line L8 (-28.371, 16.651) -> (-23.416, 16.651) projected
  line L9 (-23.416, 16.651) -> (-23.416, 16.3591) projected
  line L10 (-23.416, 16.3591) -> (-19.989, 16.3591) projected
  circle A3 centre (-21.13, 18.34) radius 1.5875 projected
  line L11 (-73.5175, -34.0475) -> (-4.3025, -34.0475) projected
  line L12 (-4.3025, -34.0475) -> (-4.3025, 22.4675) projected
  line L13 (-4.3025, 22.4675) -> (-73.5175, 22.4675) projected
  line L14 (-73.5175, 22.4675) -> (-73.5175, 8.5836) projected
  line L15 (-73.5175, 8.5836) -> (-76.0575, 6.0436) projected
  line L16 (-76.0575, 6.0436) -> (-76.0575, -27.38) projected
  line L17 (-76.0575, -27.38) -> (-76.1056, -27.9894) projected
  line L18 (-76.1056, -27.9894) -> (-73.5175, -30.5776) projected
  line L19 (-73.5175, -30.5776) -> (-73.5175, -34.0475) projected
  line L20 (-23.416, 16.754) -> (-49.197, 16.754) projected
  line L21 (-49.197, 16.754) -> (-49.197, 19.926) projected
  line L22 (-49.197, 19.926) -> (-23.416, 19.926) projected
  line L23 (-23.416, 19.926) -> (-23.416, 16.754) projected
  line L24 (-32.179, -31.506) -> (-53.261, -31.506) projected
  line L25 (-53.261, -31.506) -> (-53.261, -28.334) projected
  line L26 (-53.261, -28.334) -> (-32.179, -28.334) projected
  line L27 (-32.179, -28.334) -> (-32.179, -31.506) projected
  circle A4 centre (-12.24, 16.943) radius 1.627 projected
  line L28 (-71.041, 19.926) -> (-49.959, 19.926) projected
  line L29 (-49.959, 19.926) -> (-49.959, 16.754) projected
  line L30 (-49.959, 16.754) -> (-71.041, 16.754) projected
  line L31 (-71.041, 16.754) -> (-71.041, 19.926) projected
  line L32 (-55.039, -31.506) -> (-71.041, -31.506) projected
  line L33 (-71.041, -31.506) -> (-71.041, -28.334) projected
  line L34 (-71.041, -28.334) -> (-55.039, -28.334) projected
  line L35 (-55.039, -28.334) -> (-55.039, -31.506) projected
  line L36 (-73.681, -8.761) -> (-73.681, -0.379) projected
  line L37 (-73.681, -0.379) -> (-67.919, -0.379) projected
  line L38 (-67.919, -0.379) -> (-67.919, -8.761) projected
  line L39 (-67.919, -8.761) -> (-73.681, -8.761) projected
  point P0 (0, 0)
extrude "Extrusion5" cut sketch "Sketch7" against normal blind 3.175 contours L4 L3 L2 L0
fillet "Fillet1" radius 1.6002 2 edges at (-28.371, 16.754, 1.5875) (-23.416, 16.3591, 1.5875)
sketch "Sketch8" plane through (0, 0, 3.175) normal (0, 0, 1) x (1, 0, 0)
  circle A0 centre (-12.24, 16.943) radius 1.627 projected
  circle A1 centre (-12.24, 16.943) radius 1.9714
  point P0 (0, 0)
extrude "Extrusion6" cut sketch "Sketch8" against normal blind 25.4 contours A0 | A1
sketch "Sketch9" plane through (0, 0, 3.175) normal (0, 0, 1) x (1, 0, 0)
  line L0 (-23.416, 17.9593) -> (-23.416, 19.926) projected
  line L1 (-29.9712, 16.754) -> (-23.416, 16.754)
  line L2 (-23.416, 16.754) -> (-23.416, 19.926)
  line L3 (-23.416, 19.926) -> (-29.9712, 19.926)
  line L4 (-29.9712, 19.926) -> (-29.9712, 16.754)
  line L5 (-71.041, 19.926) -> (-71.041, 16.754) projected
  line L6 (-73.5175, 22.4675) -> (-4.3025, 22.4675) projected
  line L7 (-71.041, 19.926) -> (-23.416, 19.926)
  line L8 (-23.416, 19.926) -> (-23.416, 22.4675)
  line L9 (-23.416, 22.4675) -> (-71.041, 22.4675)
  line L10 (-71.041, 22.4675) -> (-71.041, 19.926)
  line L11 (-71.041, 19.926) -> (-29.9712, 19.926)
  line L12 (-29.9712, 19.926) -> (-29.9712, 16.754)
  line L13 (-29.9712, 16.754) -> (-71.041, 16.754)
  line L14 (-71.041, 16.754) -> (-71.041, 19.926)
  line L15 (-71.041, -31.506) -> (-55.039, -31.506) projected
  line L16 (-32.179, -31.506) -> (-32.179, -28.334) projected
  line L17 (-71.041, -31.506) -> (-32.179, -31.506)
  line L18 (-32.179, -31.506) -> (-32.179, -28.334)
  line L19 (-32.179, -28.334) -> (-71.041, -28.334)
  line L20 (-71.041, -28.334) -> (-71.041, -31.506)
  line L21 (-73.5175, -34.0475) -> (-4.3025, -34.0475) projected
  line L22 (-32.179, -31.506) -> (-71.041, -31.506)
  line L23 (-71.041, -31.506) -> (-71.041, -34.0475)
  line L24 (-71.041, -34.0475) -> (-32.179, -34.0475)
  line L25 (-32.179, -34.0475) -> (-32.179, -31.506)
  point P0 (0, 0)
extrude "Extrusion7" cut sketch "Sketch9" against normal blind 25.4
properties part number "ArduinoCaseTop"
